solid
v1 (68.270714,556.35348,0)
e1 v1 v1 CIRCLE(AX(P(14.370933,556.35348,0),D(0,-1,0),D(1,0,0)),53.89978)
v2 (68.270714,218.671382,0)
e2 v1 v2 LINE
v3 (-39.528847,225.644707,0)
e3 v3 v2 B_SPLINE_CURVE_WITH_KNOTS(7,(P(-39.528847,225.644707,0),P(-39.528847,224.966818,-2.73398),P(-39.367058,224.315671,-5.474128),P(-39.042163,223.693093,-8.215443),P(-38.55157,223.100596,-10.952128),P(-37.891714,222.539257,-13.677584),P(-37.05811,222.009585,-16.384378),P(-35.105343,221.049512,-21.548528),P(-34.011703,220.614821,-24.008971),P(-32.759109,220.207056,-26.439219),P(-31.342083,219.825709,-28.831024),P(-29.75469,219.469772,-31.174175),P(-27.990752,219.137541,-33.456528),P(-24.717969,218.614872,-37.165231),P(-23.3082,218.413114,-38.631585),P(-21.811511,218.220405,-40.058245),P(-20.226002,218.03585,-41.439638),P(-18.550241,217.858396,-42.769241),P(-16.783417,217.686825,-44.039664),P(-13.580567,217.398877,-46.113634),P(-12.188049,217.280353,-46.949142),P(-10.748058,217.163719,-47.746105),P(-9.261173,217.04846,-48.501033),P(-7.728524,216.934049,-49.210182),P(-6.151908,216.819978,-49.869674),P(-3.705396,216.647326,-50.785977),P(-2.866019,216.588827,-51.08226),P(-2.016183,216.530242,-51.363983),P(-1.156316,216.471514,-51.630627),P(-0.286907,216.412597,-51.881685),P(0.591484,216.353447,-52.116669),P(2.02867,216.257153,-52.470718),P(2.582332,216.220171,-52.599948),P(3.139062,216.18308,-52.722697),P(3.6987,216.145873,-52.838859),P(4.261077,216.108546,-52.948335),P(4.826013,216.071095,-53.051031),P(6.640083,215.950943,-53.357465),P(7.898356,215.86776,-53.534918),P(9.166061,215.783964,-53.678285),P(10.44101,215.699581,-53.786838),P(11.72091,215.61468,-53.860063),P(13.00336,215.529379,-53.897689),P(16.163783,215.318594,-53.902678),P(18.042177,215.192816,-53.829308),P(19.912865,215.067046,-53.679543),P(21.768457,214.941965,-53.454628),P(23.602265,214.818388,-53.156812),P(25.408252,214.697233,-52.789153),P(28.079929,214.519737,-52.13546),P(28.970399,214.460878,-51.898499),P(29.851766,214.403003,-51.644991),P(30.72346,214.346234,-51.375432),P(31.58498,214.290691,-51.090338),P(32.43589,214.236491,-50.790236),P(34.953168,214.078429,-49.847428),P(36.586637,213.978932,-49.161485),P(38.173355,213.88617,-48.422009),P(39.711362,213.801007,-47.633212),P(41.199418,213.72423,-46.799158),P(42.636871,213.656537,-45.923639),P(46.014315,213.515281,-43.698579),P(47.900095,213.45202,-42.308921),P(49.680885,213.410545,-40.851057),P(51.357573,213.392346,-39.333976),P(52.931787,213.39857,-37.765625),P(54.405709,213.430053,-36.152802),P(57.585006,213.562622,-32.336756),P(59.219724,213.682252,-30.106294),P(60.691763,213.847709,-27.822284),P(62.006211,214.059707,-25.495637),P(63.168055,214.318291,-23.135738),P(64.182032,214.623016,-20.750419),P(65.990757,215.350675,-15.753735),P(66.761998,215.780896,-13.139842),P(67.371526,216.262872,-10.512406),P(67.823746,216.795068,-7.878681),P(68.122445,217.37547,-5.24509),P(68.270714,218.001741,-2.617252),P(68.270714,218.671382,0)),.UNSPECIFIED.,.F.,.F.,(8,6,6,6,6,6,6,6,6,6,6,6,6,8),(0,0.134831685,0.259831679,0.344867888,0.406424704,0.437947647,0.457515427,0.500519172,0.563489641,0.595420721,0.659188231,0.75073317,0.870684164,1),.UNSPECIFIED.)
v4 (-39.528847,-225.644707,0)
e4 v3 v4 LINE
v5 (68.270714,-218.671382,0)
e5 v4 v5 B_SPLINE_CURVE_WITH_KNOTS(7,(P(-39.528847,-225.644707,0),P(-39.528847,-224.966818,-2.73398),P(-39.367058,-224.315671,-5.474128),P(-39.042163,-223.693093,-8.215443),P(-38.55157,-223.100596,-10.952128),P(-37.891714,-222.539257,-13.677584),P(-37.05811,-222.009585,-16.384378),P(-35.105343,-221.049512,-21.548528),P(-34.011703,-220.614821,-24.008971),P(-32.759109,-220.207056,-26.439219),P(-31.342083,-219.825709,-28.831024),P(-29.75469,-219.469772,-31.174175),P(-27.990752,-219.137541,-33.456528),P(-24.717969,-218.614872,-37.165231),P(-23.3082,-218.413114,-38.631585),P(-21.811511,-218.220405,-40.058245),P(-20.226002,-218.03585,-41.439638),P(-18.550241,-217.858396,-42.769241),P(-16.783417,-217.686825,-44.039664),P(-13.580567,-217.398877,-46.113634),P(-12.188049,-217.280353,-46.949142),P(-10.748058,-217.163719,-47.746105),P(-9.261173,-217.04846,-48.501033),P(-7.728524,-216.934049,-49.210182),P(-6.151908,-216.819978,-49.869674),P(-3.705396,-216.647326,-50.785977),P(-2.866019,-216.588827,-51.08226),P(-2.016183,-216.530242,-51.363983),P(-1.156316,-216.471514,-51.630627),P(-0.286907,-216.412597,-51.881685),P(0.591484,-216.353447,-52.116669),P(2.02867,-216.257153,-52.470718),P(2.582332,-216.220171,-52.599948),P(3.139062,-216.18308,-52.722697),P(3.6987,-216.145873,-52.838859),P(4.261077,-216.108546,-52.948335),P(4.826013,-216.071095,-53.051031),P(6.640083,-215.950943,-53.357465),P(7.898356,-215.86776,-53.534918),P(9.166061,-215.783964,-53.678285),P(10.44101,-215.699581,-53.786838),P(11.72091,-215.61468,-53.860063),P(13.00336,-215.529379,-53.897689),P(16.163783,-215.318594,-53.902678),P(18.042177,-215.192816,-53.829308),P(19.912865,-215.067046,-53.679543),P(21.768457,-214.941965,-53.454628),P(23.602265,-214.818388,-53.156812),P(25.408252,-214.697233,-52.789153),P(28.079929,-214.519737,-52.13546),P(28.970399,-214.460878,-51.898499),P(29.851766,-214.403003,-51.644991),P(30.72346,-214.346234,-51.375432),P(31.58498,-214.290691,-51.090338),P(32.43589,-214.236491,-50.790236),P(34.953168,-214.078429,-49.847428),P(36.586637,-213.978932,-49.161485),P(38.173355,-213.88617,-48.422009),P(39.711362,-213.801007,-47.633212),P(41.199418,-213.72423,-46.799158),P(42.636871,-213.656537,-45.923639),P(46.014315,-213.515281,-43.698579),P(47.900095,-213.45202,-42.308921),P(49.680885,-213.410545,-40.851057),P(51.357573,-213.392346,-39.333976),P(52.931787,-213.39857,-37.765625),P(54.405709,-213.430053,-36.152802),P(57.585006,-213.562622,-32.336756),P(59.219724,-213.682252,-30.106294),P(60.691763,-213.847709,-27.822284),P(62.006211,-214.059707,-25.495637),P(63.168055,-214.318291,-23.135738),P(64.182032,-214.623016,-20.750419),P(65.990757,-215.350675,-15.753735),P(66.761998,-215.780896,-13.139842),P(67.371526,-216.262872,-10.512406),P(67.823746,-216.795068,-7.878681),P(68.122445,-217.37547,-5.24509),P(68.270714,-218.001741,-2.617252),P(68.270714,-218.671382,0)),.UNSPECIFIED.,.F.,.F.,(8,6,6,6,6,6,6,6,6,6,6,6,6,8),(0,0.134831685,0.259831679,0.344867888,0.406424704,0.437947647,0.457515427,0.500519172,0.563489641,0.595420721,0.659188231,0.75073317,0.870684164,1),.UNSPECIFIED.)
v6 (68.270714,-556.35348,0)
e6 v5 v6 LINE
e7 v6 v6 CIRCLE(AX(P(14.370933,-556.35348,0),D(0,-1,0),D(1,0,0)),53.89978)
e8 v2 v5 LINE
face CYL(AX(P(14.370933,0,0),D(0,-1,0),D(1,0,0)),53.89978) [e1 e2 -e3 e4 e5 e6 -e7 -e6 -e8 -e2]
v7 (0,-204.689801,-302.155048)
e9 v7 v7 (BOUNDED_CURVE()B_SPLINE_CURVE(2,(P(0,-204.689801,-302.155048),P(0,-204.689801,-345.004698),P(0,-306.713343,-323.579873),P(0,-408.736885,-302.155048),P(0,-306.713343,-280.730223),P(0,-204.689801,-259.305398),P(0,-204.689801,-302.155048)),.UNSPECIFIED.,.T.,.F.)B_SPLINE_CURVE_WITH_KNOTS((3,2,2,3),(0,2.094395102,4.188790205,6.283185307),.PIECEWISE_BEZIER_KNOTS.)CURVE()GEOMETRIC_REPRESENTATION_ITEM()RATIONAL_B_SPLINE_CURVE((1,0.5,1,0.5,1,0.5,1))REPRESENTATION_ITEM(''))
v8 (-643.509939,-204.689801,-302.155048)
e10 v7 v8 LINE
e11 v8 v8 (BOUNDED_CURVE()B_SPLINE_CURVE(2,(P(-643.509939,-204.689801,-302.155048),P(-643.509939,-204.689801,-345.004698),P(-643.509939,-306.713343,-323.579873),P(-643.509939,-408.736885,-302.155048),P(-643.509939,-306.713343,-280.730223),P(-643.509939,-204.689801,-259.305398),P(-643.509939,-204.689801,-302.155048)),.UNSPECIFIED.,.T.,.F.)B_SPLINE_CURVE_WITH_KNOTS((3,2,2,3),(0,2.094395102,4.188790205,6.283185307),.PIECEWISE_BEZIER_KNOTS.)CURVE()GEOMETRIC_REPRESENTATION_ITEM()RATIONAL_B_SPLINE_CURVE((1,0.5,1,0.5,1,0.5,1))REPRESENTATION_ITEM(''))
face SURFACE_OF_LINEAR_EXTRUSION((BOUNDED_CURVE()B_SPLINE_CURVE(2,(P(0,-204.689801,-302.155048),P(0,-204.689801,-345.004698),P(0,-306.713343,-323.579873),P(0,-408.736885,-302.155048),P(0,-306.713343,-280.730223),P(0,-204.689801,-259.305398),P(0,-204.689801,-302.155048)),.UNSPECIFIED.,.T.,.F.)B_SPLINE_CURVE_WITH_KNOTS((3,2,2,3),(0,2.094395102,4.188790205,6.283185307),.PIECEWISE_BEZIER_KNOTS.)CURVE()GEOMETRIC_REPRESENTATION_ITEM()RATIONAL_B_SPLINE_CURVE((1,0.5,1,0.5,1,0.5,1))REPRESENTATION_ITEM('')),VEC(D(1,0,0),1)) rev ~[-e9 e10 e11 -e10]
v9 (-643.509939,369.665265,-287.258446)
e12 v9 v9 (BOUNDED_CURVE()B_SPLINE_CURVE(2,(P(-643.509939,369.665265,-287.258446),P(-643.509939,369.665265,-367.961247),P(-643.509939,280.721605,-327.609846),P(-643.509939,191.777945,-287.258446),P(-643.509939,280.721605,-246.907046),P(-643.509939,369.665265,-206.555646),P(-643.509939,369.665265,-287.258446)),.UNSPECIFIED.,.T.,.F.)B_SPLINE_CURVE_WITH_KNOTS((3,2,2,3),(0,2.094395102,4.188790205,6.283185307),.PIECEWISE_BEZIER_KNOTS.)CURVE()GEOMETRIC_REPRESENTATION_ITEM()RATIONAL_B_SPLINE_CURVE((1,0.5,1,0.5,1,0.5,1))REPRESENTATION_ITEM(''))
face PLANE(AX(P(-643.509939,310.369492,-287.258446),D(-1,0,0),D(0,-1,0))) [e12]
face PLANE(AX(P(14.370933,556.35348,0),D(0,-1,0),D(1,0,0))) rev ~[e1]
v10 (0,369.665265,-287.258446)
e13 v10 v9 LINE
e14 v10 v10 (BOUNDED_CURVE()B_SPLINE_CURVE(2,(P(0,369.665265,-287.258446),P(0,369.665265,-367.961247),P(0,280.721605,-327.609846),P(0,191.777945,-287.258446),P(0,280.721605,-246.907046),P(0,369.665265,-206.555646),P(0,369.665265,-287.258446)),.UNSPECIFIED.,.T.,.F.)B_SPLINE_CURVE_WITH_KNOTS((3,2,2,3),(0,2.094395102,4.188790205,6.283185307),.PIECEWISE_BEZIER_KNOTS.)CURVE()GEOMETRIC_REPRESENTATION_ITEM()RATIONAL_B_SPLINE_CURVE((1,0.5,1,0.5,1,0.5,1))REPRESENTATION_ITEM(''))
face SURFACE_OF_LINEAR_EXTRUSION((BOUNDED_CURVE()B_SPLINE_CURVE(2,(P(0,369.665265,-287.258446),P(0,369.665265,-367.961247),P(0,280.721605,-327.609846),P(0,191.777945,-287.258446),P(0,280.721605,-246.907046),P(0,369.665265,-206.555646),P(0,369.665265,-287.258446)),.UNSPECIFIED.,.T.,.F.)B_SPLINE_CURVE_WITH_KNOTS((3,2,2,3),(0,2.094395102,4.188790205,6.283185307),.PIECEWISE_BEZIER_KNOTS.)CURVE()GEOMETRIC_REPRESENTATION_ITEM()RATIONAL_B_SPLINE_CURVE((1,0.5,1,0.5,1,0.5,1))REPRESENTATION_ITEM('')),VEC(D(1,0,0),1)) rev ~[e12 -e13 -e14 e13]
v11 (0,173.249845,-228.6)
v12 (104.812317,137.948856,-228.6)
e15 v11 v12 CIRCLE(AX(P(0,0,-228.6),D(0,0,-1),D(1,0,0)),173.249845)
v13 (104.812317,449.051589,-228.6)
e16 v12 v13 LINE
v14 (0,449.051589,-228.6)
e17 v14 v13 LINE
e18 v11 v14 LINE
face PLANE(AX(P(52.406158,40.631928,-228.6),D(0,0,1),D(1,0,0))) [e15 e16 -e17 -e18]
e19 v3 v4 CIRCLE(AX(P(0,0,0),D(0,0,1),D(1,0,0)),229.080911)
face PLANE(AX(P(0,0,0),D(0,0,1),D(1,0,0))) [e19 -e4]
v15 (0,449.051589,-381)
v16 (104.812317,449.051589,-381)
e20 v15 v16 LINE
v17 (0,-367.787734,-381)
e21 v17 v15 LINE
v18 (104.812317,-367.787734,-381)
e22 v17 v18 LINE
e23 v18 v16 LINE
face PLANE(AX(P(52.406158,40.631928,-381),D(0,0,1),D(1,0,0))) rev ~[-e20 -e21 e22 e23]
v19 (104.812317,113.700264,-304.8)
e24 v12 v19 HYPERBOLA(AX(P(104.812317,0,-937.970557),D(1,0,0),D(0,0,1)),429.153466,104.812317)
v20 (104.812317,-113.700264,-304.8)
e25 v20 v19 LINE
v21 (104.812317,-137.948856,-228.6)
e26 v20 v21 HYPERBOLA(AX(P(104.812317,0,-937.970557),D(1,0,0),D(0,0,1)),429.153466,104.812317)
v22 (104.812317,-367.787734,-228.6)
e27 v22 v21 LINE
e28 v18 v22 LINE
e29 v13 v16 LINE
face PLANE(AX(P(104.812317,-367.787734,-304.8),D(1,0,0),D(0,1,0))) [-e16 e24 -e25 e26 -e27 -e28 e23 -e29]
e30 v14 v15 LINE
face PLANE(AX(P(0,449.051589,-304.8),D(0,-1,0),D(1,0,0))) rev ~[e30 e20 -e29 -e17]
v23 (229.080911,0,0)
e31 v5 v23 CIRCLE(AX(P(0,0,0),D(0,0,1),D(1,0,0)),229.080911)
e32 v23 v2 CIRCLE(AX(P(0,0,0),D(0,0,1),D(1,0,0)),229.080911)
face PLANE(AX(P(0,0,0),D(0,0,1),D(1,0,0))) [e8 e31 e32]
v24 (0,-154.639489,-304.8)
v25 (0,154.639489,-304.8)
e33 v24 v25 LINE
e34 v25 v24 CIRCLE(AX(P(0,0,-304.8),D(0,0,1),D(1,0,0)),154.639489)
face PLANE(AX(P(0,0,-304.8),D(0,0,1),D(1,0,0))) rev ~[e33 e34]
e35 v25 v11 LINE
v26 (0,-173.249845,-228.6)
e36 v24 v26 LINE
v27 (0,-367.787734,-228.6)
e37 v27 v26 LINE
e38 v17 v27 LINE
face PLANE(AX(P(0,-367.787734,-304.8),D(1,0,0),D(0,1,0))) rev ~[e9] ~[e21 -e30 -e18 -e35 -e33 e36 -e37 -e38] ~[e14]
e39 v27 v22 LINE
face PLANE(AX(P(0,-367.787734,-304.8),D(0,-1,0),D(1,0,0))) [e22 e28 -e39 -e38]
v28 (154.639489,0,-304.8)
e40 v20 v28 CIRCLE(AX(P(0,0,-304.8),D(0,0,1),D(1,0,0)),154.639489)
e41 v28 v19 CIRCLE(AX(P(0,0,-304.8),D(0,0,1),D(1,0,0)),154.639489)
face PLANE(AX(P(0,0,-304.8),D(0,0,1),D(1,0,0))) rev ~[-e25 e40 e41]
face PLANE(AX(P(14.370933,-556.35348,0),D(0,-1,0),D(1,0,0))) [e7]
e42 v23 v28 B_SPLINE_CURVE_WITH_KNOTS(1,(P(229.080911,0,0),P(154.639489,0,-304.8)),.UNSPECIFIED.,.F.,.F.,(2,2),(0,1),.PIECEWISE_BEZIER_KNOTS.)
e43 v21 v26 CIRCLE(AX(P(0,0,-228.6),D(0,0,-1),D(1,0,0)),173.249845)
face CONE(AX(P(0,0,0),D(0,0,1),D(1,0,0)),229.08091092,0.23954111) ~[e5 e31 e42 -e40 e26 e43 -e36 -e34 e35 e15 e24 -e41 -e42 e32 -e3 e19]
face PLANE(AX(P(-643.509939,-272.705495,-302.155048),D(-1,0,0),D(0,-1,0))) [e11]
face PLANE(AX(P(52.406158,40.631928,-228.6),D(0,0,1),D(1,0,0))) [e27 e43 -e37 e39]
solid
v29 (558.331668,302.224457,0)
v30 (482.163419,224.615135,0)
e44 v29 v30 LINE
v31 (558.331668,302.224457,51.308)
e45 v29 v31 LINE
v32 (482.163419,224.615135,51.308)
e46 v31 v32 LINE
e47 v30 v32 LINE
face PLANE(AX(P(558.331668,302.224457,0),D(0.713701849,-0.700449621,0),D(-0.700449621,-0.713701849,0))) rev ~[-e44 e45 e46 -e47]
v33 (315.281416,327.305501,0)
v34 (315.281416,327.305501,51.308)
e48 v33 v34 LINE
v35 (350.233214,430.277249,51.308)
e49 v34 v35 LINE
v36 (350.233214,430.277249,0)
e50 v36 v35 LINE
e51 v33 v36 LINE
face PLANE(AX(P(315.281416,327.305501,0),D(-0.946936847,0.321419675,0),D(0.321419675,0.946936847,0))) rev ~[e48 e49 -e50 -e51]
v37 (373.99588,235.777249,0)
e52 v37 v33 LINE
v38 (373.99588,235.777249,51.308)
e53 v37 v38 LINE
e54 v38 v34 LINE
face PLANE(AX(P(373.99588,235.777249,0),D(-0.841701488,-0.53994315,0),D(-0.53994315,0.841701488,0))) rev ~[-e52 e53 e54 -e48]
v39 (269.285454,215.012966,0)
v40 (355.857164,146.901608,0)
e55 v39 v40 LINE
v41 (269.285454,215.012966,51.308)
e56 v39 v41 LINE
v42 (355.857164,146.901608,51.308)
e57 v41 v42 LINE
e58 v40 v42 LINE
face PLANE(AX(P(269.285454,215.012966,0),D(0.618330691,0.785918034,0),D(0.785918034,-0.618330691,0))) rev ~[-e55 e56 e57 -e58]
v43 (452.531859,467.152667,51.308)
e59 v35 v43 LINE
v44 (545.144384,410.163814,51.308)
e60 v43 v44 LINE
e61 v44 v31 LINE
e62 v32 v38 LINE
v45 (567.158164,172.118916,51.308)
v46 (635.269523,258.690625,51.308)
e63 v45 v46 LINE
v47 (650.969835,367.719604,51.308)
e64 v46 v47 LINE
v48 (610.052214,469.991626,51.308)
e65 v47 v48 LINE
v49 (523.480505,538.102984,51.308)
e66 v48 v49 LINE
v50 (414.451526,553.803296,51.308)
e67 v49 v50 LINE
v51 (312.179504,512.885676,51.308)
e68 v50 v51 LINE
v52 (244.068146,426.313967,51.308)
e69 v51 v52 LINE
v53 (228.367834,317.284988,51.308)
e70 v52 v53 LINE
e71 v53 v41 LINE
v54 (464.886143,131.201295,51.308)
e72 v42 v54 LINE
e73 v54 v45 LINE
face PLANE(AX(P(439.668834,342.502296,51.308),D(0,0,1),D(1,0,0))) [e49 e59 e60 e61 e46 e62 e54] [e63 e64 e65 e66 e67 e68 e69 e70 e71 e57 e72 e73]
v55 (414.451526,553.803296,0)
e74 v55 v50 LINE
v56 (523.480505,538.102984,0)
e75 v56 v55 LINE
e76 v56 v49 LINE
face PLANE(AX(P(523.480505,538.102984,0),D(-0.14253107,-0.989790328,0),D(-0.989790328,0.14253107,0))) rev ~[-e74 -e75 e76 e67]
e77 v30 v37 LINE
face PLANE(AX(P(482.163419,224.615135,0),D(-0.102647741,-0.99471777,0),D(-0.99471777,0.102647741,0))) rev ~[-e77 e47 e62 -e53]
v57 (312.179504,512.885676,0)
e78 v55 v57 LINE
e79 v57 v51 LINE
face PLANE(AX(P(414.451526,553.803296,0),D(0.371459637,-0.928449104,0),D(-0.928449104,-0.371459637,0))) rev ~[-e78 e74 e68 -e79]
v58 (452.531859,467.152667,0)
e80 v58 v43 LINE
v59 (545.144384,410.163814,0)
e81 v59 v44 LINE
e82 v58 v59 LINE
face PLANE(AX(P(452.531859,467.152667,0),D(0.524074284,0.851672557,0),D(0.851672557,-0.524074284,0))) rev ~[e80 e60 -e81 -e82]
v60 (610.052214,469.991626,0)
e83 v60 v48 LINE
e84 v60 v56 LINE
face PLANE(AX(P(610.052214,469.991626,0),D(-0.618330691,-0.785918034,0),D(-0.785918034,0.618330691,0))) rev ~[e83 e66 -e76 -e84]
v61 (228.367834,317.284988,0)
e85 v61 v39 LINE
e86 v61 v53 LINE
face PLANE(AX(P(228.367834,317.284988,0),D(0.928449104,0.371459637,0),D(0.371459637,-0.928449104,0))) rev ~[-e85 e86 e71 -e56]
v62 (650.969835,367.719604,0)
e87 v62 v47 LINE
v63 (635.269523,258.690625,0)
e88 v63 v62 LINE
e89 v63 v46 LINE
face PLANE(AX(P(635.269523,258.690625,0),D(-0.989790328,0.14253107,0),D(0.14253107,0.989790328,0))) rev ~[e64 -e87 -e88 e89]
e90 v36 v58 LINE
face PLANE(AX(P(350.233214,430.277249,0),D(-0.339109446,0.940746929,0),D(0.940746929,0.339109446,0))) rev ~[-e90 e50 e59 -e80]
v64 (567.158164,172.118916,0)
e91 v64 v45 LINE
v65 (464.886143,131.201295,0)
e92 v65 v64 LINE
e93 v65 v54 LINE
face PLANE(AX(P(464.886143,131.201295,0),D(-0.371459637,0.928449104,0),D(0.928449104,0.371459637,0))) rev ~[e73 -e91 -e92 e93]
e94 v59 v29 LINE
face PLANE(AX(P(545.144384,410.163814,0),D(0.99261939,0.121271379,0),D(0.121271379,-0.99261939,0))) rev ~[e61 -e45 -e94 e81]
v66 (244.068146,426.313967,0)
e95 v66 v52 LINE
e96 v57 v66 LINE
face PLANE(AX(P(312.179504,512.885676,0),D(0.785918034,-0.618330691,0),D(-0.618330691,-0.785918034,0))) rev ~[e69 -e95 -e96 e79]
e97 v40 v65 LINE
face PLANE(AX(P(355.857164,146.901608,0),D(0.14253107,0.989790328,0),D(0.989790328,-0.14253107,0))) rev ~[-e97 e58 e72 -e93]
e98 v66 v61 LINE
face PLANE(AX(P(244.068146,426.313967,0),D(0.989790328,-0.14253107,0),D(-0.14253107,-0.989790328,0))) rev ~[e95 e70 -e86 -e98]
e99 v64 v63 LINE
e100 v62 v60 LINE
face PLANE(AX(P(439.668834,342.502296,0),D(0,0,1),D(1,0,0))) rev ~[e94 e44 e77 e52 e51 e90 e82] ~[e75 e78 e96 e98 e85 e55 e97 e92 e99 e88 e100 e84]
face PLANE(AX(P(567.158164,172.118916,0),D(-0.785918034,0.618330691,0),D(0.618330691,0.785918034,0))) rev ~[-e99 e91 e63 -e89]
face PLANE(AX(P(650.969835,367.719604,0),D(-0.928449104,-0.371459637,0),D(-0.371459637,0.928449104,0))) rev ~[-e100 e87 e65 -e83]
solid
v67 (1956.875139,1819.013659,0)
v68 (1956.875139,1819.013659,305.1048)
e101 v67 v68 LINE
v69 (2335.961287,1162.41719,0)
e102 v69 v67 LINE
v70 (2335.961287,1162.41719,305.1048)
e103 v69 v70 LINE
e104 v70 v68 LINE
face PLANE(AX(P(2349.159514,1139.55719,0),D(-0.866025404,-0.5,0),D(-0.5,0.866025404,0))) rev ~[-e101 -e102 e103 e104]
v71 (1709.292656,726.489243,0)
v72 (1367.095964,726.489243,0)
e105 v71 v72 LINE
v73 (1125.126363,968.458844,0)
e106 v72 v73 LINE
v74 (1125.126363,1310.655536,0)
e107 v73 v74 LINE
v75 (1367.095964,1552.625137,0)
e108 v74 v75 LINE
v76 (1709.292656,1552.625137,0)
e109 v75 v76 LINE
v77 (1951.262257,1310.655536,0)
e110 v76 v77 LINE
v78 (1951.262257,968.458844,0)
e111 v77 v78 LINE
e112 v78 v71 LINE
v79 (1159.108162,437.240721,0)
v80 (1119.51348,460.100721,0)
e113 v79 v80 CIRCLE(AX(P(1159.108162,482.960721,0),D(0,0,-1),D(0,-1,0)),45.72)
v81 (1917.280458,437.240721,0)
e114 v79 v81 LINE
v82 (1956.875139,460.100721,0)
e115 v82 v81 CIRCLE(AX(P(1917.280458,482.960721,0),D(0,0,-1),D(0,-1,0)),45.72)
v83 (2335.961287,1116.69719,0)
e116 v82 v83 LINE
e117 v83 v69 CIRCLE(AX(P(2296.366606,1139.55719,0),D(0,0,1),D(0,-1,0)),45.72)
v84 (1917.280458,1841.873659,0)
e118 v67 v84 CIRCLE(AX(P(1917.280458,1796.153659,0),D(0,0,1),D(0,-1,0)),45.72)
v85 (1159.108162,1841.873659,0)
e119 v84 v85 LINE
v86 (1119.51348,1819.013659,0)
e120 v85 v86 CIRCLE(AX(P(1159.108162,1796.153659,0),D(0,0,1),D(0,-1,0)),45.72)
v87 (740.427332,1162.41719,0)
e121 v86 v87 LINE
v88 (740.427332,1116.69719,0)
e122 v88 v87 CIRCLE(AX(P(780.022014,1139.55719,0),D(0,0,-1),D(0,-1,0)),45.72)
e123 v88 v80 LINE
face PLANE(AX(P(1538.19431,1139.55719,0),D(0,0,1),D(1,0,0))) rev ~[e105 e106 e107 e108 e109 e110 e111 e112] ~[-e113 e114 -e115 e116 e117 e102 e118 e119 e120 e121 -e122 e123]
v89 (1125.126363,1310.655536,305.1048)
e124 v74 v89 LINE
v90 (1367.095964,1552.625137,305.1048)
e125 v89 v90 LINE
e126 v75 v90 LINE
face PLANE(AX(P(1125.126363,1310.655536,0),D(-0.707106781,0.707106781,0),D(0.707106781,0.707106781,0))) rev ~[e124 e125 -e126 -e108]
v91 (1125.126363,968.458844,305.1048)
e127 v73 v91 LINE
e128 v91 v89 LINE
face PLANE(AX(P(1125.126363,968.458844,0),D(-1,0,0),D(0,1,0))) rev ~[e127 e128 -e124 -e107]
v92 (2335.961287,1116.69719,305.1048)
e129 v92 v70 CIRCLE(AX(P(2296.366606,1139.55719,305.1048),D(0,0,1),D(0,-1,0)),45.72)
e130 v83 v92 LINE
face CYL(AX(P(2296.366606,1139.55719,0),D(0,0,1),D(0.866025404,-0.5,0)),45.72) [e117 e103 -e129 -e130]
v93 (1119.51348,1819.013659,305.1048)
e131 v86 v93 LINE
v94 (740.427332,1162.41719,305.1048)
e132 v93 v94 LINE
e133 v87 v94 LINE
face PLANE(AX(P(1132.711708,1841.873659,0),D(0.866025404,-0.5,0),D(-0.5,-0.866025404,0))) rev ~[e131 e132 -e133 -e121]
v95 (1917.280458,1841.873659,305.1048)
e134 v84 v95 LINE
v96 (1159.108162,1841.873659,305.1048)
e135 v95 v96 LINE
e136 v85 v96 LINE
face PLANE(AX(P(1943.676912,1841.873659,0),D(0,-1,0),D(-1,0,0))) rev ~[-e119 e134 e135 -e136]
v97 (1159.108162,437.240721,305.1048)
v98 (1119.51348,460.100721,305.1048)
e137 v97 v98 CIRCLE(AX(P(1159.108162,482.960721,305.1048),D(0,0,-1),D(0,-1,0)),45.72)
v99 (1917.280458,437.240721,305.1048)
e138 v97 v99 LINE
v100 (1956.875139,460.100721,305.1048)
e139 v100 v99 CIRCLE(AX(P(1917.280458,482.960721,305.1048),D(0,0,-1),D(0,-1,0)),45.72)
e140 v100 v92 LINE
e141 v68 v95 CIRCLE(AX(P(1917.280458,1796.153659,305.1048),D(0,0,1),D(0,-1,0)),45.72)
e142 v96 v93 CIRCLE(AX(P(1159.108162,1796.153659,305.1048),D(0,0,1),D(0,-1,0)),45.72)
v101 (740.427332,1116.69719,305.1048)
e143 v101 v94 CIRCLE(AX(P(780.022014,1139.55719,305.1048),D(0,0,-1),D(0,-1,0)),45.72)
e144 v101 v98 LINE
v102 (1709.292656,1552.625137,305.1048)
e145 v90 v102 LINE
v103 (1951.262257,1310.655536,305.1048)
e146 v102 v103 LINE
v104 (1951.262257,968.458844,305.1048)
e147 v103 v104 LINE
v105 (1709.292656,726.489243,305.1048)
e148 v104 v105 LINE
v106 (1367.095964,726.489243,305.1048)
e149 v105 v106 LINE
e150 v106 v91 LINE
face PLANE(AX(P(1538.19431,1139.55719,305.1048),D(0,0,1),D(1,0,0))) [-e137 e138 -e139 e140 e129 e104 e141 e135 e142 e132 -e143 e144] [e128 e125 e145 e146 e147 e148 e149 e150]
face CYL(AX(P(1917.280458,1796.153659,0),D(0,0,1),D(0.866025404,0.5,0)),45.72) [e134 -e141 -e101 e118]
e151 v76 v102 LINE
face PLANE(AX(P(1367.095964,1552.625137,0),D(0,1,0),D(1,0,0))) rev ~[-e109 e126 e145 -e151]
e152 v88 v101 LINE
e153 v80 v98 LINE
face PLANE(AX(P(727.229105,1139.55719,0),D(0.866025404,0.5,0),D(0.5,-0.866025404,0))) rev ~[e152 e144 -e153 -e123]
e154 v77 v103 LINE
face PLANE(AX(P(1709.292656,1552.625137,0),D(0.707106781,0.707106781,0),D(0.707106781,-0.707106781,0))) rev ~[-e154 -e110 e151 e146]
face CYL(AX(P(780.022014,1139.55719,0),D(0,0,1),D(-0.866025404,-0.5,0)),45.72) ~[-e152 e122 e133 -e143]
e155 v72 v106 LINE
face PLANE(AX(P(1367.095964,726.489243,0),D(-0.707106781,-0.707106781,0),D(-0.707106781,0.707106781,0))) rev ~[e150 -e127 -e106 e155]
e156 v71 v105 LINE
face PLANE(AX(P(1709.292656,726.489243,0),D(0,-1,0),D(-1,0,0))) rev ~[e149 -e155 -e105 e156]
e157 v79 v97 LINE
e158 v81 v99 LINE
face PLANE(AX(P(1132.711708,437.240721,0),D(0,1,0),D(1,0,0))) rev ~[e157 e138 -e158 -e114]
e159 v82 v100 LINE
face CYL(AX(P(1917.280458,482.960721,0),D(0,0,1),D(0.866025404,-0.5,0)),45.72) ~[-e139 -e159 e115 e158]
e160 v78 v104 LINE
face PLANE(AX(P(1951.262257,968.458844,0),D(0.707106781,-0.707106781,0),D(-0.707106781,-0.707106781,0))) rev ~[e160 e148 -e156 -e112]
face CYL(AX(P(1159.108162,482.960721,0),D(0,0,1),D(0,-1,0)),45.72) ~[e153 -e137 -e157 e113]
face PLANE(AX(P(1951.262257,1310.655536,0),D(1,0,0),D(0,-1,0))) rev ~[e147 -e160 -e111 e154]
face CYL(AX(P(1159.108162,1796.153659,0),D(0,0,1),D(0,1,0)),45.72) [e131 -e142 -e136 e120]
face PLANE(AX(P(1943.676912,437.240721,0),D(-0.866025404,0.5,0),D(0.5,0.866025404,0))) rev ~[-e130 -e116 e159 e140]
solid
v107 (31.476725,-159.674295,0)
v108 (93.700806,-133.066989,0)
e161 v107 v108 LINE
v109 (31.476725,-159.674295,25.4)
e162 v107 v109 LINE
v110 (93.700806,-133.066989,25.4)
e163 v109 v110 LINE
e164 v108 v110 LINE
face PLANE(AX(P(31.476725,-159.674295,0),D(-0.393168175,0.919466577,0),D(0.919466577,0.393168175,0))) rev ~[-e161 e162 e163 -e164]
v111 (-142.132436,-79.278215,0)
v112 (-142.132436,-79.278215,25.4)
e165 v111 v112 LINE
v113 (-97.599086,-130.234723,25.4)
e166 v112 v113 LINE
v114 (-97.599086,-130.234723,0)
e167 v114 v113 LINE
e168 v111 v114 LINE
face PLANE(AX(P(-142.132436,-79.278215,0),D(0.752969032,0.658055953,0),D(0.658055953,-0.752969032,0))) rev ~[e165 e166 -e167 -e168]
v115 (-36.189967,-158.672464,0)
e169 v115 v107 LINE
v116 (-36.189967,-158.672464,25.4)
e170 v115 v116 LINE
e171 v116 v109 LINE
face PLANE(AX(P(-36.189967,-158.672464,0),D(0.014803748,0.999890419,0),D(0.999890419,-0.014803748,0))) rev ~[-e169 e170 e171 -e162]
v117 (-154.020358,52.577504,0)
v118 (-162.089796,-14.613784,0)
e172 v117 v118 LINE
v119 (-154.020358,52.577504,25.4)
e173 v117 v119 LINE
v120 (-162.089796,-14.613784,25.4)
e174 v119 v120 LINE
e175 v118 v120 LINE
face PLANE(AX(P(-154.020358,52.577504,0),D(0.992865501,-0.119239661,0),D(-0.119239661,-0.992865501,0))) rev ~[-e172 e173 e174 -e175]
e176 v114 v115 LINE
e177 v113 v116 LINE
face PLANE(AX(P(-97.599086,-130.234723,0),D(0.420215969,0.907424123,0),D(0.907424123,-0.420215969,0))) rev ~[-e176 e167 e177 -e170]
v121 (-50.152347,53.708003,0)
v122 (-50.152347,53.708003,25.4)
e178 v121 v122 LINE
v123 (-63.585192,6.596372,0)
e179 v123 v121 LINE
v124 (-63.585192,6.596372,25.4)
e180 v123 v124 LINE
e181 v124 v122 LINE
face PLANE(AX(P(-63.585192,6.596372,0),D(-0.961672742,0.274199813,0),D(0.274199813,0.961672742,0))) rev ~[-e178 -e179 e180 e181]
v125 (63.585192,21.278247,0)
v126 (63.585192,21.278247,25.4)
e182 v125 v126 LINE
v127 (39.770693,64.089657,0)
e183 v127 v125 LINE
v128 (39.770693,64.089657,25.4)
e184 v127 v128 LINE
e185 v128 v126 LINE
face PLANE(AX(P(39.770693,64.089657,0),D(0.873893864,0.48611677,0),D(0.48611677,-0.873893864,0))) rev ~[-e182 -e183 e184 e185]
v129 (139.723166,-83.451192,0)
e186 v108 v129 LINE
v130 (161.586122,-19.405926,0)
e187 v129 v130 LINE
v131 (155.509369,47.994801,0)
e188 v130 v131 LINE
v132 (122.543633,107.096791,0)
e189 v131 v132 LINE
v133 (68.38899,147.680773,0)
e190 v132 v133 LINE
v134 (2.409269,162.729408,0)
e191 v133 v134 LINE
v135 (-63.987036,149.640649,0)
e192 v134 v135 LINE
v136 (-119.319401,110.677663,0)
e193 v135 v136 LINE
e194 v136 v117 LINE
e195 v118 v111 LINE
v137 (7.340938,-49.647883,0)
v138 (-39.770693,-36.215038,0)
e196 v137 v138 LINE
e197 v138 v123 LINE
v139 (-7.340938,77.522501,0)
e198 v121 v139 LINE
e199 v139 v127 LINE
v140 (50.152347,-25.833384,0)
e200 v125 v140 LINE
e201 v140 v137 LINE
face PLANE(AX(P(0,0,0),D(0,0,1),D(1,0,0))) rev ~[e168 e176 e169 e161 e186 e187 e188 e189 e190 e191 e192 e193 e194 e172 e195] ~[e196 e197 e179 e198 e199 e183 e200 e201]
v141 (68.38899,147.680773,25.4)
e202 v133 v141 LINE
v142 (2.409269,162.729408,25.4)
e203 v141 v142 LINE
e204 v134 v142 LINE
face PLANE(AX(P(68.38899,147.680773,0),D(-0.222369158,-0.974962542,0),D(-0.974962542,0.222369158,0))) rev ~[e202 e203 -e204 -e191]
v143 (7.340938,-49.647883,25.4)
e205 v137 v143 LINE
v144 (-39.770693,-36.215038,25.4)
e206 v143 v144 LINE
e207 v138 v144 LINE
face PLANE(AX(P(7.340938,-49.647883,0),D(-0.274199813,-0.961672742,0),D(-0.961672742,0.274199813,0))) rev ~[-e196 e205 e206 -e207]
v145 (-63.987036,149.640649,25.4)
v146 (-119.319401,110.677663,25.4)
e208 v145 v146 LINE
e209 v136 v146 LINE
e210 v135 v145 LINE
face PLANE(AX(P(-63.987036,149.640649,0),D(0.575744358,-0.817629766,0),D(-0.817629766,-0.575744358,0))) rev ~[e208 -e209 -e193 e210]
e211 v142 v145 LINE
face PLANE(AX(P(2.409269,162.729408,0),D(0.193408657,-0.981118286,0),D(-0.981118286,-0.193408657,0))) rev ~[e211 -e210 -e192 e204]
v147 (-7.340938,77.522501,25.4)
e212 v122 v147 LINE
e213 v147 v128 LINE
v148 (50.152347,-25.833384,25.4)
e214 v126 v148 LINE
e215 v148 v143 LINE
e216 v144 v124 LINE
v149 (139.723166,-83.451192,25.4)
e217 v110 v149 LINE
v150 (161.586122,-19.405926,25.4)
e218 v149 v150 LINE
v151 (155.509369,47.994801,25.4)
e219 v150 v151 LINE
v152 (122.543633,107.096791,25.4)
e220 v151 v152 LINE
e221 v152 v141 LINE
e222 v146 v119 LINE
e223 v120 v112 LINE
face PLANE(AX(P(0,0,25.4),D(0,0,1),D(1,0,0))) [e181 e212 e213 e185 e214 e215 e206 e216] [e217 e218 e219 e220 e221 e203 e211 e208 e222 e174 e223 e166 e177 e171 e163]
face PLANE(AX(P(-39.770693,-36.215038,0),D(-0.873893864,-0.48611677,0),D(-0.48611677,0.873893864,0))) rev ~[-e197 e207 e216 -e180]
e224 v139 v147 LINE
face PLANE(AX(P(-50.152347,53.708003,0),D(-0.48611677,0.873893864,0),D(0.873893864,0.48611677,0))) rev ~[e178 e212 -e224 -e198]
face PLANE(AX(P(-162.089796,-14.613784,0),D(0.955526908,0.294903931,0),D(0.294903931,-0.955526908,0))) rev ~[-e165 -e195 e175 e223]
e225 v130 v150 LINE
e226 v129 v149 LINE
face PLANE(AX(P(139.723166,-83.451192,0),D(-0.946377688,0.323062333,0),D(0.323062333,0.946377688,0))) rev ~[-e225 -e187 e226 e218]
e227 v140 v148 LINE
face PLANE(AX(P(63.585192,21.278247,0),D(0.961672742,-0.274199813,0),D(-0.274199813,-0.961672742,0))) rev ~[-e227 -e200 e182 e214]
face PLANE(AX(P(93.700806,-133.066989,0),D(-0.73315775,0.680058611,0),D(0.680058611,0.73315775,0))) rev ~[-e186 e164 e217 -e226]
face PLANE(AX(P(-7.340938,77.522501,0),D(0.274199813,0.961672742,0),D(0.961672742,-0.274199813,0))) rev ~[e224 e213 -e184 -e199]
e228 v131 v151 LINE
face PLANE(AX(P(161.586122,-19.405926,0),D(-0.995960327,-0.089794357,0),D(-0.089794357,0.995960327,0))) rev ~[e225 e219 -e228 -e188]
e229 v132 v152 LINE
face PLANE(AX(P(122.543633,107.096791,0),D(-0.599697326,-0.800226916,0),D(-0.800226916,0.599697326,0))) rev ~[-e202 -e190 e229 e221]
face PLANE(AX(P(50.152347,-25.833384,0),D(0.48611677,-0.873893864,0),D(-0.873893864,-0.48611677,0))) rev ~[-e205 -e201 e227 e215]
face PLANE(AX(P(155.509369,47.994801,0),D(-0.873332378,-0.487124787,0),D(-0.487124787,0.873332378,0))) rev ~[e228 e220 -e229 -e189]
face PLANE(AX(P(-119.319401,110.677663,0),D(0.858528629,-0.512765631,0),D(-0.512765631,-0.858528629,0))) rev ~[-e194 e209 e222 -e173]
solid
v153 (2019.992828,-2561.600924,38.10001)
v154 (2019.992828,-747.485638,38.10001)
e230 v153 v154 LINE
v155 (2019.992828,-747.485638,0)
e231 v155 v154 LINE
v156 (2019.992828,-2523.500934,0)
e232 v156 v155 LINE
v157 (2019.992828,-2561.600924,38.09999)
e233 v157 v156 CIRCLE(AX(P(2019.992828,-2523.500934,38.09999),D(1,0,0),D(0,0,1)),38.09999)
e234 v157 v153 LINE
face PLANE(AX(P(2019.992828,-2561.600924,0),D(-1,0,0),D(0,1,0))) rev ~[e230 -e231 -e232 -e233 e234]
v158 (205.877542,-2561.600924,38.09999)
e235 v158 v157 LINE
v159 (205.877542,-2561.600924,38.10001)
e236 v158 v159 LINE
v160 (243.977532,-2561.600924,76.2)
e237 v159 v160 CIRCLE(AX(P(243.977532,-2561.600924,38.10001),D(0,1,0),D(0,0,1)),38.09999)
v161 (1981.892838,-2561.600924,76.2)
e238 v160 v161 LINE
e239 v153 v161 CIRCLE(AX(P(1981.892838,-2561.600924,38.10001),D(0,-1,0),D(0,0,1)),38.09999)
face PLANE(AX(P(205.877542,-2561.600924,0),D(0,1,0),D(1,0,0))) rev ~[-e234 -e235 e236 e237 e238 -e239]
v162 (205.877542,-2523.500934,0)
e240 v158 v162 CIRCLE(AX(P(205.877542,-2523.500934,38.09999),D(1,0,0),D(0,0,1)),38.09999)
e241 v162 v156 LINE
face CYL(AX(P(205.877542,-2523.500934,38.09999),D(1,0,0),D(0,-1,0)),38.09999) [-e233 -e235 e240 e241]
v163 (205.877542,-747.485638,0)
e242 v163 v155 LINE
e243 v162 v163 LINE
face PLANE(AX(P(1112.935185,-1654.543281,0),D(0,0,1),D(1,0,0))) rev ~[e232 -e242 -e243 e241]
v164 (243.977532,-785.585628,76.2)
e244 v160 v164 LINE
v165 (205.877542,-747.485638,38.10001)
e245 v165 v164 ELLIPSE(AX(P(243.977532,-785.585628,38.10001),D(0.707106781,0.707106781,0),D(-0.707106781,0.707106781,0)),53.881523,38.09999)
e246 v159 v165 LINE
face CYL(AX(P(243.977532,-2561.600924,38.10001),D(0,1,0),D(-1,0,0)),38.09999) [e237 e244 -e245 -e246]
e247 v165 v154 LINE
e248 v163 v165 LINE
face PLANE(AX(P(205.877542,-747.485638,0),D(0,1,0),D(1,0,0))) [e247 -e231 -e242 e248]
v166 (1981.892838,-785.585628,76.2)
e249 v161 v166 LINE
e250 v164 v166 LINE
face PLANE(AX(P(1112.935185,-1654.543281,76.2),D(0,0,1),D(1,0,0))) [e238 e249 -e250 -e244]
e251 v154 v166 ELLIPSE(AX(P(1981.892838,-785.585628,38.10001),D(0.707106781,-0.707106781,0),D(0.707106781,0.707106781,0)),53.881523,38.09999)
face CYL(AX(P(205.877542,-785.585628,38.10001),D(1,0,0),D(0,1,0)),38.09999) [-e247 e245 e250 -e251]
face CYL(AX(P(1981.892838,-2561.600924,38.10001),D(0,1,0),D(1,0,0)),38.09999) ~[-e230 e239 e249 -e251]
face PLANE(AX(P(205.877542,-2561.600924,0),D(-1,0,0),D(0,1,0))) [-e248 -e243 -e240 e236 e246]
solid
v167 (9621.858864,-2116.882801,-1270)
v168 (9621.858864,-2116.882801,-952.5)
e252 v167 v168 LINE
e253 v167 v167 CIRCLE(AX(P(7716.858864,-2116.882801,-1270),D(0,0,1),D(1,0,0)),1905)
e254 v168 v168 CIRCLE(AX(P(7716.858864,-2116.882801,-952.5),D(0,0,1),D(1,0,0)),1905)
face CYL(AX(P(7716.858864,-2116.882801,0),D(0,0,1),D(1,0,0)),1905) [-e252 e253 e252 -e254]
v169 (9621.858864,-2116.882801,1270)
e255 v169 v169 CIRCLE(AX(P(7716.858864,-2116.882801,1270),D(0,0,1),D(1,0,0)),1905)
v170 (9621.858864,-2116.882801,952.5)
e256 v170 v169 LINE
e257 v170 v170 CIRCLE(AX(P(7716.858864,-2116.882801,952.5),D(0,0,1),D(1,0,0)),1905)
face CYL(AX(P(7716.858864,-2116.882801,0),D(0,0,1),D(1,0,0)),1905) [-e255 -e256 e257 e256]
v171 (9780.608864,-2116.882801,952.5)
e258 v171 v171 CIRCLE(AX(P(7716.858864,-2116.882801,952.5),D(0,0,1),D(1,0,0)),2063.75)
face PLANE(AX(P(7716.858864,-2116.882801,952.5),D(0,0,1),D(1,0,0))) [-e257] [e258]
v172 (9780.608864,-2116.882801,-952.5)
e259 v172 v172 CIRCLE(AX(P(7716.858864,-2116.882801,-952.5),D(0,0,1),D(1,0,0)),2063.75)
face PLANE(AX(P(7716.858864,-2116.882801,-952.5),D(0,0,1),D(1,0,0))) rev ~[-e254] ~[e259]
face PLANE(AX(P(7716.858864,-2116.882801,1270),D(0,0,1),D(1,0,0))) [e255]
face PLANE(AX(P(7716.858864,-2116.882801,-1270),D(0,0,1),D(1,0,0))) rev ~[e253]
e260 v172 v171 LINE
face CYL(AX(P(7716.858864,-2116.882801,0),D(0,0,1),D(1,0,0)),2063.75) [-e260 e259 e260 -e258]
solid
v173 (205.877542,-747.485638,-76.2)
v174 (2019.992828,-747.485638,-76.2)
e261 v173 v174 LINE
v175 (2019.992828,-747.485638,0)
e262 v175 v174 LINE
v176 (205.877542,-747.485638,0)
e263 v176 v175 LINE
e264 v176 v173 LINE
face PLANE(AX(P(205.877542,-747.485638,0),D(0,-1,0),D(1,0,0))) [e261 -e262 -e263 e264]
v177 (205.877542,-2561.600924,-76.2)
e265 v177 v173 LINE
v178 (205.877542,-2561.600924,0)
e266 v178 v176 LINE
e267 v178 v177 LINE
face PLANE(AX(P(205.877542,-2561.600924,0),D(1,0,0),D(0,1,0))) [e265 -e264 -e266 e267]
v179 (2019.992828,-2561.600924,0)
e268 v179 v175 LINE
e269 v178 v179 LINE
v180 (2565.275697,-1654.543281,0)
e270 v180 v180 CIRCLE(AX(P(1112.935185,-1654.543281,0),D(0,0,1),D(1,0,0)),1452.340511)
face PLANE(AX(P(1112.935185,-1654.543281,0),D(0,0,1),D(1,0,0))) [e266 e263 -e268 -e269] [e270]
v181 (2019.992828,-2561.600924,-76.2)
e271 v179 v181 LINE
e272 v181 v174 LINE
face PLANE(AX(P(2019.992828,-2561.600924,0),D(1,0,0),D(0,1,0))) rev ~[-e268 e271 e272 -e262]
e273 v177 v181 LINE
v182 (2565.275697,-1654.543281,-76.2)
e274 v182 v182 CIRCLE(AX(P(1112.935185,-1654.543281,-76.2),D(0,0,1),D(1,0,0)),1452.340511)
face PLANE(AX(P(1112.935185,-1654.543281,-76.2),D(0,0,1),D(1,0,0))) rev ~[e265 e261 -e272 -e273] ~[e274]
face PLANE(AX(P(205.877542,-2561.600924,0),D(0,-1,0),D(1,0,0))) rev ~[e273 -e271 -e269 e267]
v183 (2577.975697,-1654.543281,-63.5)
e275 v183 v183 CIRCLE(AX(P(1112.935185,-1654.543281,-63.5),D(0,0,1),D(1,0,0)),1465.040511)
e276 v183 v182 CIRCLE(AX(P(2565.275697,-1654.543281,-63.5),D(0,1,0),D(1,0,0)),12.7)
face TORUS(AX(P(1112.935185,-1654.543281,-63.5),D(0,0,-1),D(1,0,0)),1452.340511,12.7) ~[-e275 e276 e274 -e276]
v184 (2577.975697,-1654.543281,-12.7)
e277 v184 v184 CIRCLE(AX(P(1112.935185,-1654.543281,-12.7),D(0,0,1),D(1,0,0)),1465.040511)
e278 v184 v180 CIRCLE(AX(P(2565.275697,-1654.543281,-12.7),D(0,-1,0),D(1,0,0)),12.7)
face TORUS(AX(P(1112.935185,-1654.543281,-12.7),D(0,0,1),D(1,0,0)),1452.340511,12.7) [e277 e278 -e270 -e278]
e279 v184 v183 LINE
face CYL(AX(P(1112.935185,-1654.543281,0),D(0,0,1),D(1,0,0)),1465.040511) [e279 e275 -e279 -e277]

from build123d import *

# Parameters (mm, degrees)
F1_DEPTH  = 25.4
F3_DEPTH  = 51.308
F5_DEPTH  = 305.1048
F6_R      = 45.72
F7_R      = 1465.0405111475
F7_W      = 1814.1152858734
F7_H      = 1814.1152858734
F8_DEPTH  = 76.2
F9_DEPTH  = 76.2
F10_R     = 38.09999
F11_R     = 12.7
F12_R     = 1905
F13_DEPTH = 1270
F12_R_2   = 2063.75
F14_DEPTH = 952.5
F19_R     = 229.0809109199
F21_R     = 154.6394893279
F23_W     = 104.8123165965
F23_H     = 816.8393224478
F24_DEPTH = 76.2
F26_DEPTH = 643.5099393129
F27_R     = 53.8997804339
F28_DEPTH = 556.3534796238


# Not quite as in the source:
# - a fillet or chamfer is up to 0.001 mm smaller than in the source, because OpenCascade refuses the exact size
# - the program builds the solid bodies; features that only make, move or delete a surface that nothing else refers to are left out


with BuildPart() as f1:
    # F0 (on Top) → F1 (new body)
    with BuildSketch(Plane.XY):
        Polygon((155.50936864, 47.9948012801), (122.5436329842, 107.0967912674), (68.3889899114, 147.6807731007), (2.4092691885, 162.7294076272), (-63.9870360646, 149.6406492247), (-119.3194014782, 110.6776631286), (-154.0203583934, 52.5775036026), (-162.0897961115, -14.6137839479), (-142.1324355422, -79.2782154918), (-97.5990856351, -130.2347233572), (-36.1899671618, -158.6724644088), (31.4767254093, -159.67429487), (93.7008062, -133.0669891528), (139.7231663537, -83.4511921354), (161.5861216997, -19.4059258675), align=None)
        Polygon((39.7706934855, 64.0896567419), (63.5851919651, 21.2782472372), (50.1523473576, -25.8333841012), (7.3409378529, -49.6478825808), (-39.7706934855, -36.2150379733), (-63.5851919651, 6.5963715315), (-50.1523473576, 53.7080028699), (-7.3409378529, 77.5225013494), align=None, mode=Mode.SUBTRACT)
    extrude(amount=F1_DEPTH)


with BuildPart() as f3:
    # F2 (on Top) → F3 (new body)
    with BuildSketch(Plane.XY):
        Polygon((567.1581641405, 172.1189159194), (635.2695226669, 258.6906254292), (650.9698346822, 367.7196043769), (610.052214261, 469.9916259019), (523.4805047512, 538.1029844284), (414.4515258035, 553.8032964437), (312.1795042784, 512.8856760224), (244.068145752, 426.3139665127), (228.3678337366, 317.284987565), (269.2854541579, 215.0129660399), (355.8571636677, 146.9016075134), (464.8861426154, 131.2012954981), align=None)
        Polygon((545.1443835194, 410.1638138472), (558.3316683769, 302.2244572639), (482.1634188256, 224.6151347452), (373.9958803268, 235.7772490893), (315.2814155857, 327.3055005294), (350.2332141092, 430.2772488952), (452.5318587224, 467.1526674262), align=None, mode=Mode.SUBTRACT)
    extrude(amount=F3_DEPTH)


with BuildPart() as f5:
    # F4 (on Top) → F5 (new body)
    with BuildSketch(Plane.XY):
        Polygon((1943.6769121667, 437.2407213386), (2349.1595144473, 1139.5571900737), (1943.6769121667, 1841.8736588088), (1132.7117076057, 1841.8736588088), (727.2291053252, 1139.5571900737), (1132.7117076057, 437.2407213386), align=None)
        Polygon((1709.2926557119, 1552.6251370658), (1951.2622568783, 1310.6555358994), (1951.2622568783, 968.458844248), (1709.2926557119, 726.4892430816), (1367.0959640605, 726.4892430816), (1125.1263628941, 968.458844248), (1125.1263628941, 1310.6555358994), (1367.0959640605, 1552.6251370658), align=None, mode=Mode.SUBTRACT)
    extrude(amount=F5_DEPTH)

    # F6
    f6_edges = [f5.edges().sort_by_distance(p)[0] for p in [
        (1943.676912, 437.240721, 152.5524),
        (2349.159514, 1139.55719, 152.5524),
        (1943.676912, 1841.873659, 152.5524),
        (1132.711708, 1841.873659, 152.5524),
        (727.229105, 1139.55719, 152.5524),
        (1132.711708, 437.240721, 152.5524),
    ]]
    fillet(f6_edges, radius=F6_R)


with BuildPart() as f8:
    # F7 (on Top) → F8 (new body)
    with BuildSketch(Plane.XY):
        with Locations((1112.9351854324, -1654.5432806015)):
            Circle(F7_R)
        with Locations((1112.9351854324, -1654.5432806015)):
            Rectangle(F7_W, F7_H, mode=Mode.SUBTRACT)
    extrude(amount=-F8_DEPTH)

    # F11
    f11_edges = [f8.edges().sort_by_distance(p)[0] for p in [
        (-352.105326, -1654.543281, 0),
        (-352.105326, -1654.543281, -76.2),
    ]]
    fillet(f11_edges, radius=F11_R)


with BuildPart() as f9:
    # F7 (on Top) → F9 (new body)
    with BuildSketch(Plane.XY):
        with Locations((1112.9351854324, -1654.5432806015)):
            Rectangle(F7_W, F7_H)
    extrude(amount=F9_DEPTH)

    # F10 (radius 38.1 in the source; OpenCascade refuses exactly that, so slightly less here)
    f10_edges = [f9.edges().sort_by_distance(p)[0] for p in [
        (205.877542, -1654.543281, 76.2),
        (2019.992828, -1654.543281, 76.2),
        (1112.935185, -2561.600924, 0),
        (1112.935185, -747.485638, 76.2),
    ]]
    fillet(f10_edges, radius=F10_R)


with BuildPart() as f13:
    # F12 (on Top) → F13 (new body, symmetric)
    with BuildSketch(Plane.XY):
        with Locations((7716.8588638306, -2116.8828010559)):
            Circle(F12_R)
    extrude(amount=F13_DEPTH, both=True)

    # F12 (on Top) → F14 (join, symmetric)
    with BuildSketch(Plane.XY):
        with Locations((7716.8588638306, -2116.8828010559)):
            Circle(F12_R_2)
        with Locations((7716.8588638306, -2116.8828010559)):
            Circle(F12_R, mode=Mode.SUBTRACT)
    extrude(amount=F14_DEPTH, both=True)


with BuildPart() as f22:
    # F19 (on Top) → F22 section 0
    with BuildSketch(Plane.XY):
        Circle(F19_R)
    # F21 (on offset) → F22 section 1
    with BuildSketch(Plane.XY.offset(-304.8)):
        Circle(F21_R)
    loft()

    # F23 (on offset) → F24 (join, symmetric)
    with BuildSketch(Plane.XY.offset(-304.8)):
        with Locations((52.4061582983, 40.6319275498)):
            Rectangle(F23_W, F23_H)
    extrude(amount=F24_DEPTH, both=True)

    # F25 (on face) → F26 (join)
    with BuildSketch(Plane(origin=(0, 0, 0), x_dir=(0, -1, 0), z_dir=(-1, 0, 0))):
        with BuildLine():
            add(Edge.make_bspline(
                [(204.6898007393, -302.1550476551), (204.6898007393, -345.0046976312), (306.7133426666, -323.5798726431), (408.736884594, -302.1550476551), (306.7133426666, -280.7302226671), (204.6898007393, -259.305397679), (204.6898007393, -302.1550476551)],
                knots=[0, 0, 0, 2.0943951024, 2.0943951024, 4.1887902048, 4.1887902048, 6.2831853072, 6.2831853072, 6.2831853072], degree=2, weights=[1, 0.5, 1, 0.5, 1, 0.5, 1]))
        make_face()
        with BuildLine():
            add(Edge.make_bspline(
                [(-369.6652650833, -287.2584462166), (-369.6652650833, -367.9612465382), (-280.7216048241, -327.6098463774), (-191.7779445648, -287.2584462166), (-280.7216048241, -246.9070460558), (-369.6652650833, -206.555645895), (-369.6652650833, -287.2584462166)],
                knots=[0, 0, 0, 2.0943951024, 2.0943951024, 4.1887902048, 4.1887902048, 6.2831853072, 6.2831853072, 6.2831853072], degree=2, weights=[1, 0.5, 1, 0.5, 1, 0.5, 1]))
        make_face()
    extrude(amount=F26_DEPTH)

    # F27 (on Front) → F28 (join, symmetric)
    with BuildSketch(Plane.XZ):
        with Locations((14.3709331751, 0)):
            Circle(F27_R)
    extrude(amount=F28_DEPTH, both=True)


solid = Compound([f1.part, f3.part, f5.part, f8.part, f9.part, f13.part, f22.part])
